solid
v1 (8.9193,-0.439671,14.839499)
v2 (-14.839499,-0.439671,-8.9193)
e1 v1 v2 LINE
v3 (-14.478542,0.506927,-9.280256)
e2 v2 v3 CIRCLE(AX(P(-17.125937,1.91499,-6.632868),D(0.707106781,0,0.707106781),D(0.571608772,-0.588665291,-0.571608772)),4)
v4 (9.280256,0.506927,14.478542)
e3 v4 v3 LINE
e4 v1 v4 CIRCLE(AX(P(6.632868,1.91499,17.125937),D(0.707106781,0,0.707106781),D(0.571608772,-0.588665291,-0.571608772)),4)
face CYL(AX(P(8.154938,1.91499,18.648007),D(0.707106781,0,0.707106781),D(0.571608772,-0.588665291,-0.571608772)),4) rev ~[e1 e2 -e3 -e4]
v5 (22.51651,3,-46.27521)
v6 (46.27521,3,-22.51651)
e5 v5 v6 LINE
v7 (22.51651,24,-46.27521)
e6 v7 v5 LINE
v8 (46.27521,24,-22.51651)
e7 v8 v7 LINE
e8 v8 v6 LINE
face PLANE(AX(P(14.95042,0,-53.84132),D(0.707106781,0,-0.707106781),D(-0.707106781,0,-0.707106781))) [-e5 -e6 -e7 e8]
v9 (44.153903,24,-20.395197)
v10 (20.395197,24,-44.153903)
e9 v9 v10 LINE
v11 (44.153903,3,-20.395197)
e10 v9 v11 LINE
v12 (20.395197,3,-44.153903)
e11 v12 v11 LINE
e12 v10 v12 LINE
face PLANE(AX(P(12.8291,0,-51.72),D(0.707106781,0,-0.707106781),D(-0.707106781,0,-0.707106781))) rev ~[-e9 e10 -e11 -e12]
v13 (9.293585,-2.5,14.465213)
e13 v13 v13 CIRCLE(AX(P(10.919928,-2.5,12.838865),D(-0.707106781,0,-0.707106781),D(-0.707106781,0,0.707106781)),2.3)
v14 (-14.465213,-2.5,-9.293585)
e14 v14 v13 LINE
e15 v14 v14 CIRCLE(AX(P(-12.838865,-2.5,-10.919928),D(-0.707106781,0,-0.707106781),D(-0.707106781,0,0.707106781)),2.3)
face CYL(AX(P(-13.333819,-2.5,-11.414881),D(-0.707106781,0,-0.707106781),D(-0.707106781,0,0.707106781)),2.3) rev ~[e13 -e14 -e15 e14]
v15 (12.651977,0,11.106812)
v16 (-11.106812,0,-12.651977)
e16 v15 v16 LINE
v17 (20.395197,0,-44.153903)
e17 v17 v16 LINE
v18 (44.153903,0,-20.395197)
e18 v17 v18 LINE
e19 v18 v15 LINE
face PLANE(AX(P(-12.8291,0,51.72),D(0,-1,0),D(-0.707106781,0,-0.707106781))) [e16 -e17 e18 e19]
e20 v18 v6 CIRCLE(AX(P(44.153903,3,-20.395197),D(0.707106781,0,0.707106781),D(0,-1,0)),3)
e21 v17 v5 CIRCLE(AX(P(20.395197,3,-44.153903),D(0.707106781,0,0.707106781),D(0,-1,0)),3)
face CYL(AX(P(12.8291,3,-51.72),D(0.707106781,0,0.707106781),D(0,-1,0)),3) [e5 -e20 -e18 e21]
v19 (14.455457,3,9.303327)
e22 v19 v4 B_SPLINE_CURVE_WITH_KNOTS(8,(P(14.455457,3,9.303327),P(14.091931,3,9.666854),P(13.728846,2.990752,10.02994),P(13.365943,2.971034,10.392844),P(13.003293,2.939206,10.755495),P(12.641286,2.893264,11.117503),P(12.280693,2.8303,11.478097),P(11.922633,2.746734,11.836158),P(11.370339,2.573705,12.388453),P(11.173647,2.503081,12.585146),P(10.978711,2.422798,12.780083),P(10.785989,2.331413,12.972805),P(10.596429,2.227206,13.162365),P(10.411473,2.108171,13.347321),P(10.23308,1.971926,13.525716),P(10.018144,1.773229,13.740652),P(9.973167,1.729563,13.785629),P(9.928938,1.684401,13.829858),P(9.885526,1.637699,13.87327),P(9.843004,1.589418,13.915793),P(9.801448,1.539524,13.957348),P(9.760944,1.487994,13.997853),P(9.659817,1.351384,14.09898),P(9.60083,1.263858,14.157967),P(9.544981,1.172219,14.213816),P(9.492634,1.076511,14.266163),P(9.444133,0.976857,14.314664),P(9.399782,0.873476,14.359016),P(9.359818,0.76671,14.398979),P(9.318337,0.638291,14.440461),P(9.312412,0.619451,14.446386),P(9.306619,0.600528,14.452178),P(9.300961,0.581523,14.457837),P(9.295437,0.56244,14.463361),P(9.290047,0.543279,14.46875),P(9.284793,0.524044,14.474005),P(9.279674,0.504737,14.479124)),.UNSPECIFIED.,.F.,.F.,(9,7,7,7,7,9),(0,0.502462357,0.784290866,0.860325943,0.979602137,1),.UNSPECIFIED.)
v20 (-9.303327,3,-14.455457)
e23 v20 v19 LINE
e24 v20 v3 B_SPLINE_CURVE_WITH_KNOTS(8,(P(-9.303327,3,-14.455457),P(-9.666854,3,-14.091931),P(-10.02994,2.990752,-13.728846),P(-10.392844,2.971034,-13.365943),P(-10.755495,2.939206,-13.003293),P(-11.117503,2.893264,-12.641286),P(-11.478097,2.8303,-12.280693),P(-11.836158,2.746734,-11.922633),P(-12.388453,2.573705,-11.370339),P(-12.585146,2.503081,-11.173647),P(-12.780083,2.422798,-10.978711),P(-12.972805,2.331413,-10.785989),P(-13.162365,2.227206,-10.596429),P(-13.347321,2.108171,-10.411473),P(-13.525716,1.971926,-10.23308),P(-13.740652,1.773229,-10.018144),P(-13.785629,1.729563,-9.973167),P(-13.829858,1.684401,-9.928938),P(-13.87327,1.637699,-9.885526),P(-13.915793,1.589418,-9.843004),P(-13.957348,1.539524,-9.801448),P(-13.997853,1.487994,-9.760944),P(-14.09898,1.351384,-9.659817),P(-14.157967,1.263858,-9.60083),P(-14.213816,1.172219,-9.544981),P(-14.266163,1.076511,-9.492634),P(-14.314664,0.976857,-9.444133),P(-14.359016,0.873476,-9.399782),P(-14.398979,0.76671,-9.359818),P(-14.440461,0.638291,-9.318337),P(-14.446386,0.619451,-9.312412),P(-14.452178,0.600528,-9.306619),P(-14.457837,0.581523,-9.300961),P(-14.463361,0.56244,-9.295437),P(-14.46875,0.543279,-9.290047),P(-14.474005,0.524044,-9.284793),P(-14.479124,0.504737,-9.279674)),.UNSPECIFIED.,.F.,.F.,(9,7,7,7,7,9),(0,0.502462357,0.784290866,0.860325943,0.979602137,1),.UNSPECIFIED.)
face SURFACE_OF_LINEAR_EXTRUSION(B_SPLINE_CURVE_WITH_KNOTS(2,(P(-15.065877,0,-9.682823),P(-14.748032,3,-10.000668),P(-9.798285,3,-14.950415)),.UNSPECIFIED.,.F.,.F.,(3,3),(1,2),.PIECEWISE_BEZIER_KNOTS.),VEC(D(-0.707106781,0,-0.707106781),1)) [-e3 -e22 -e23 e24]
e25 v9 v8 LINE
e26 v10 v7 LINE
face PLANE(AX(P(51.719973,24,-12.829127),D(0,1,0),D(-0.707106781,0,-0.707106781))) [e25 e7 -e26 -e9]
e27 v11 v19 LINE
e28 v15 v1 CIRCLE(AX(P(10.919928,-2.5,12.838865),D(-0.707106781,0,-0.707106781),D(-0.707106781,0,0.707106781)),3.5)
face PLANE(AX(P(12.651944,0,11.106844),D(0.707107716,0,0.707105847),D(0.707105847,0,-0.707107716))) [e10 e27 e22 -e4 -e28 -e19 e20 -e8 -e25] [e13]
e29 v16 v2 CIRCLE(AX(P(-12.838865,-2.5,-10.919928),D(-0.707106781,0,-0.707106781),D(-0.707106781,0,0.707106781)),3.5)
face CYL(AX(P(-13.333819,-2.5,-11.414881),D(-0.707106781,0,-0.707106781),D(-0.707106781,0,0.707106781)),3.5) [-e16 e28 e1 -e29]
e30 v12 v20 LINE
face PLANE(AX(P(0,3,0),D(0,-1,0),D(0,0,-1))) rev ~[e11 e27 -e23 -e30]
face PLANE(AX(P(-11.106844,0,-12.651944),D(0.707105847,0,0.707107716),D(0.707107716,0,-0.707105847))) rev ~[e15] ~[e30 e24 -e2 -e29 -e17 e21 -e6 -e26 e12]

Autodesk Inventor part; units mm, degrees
ref_plane "YZ Plane" through (0, 0, 0) normal (1, 0, 0) x (0, 1, 0)
ref_plane "XZ Plane" through (0, 0, 0) normal (0, 1, 0) x (-1, 0, 0)
ref_plane "XY Plane" through (0, 0, 0) normal (0, 0, 1) x (1, 0, 0)
sketch "Esquisse1" plane through (0, 0, 0) normal (0, 1, 0) x (-1, 0, 0)
  line L0 (35, 35) -> (35, 14)
  line L1 (35, 14) -> (42, 10)
  line L2 (42, 10) -> (42, 0)
  line L3 (35, 35) -> (0, 0)
  line L4 (42, 0) -> (0, 0) construction
  line L5 (35, -35) -> (35, -14)
  line L6 (35, -14) -> (42, -10)
  line L7 (42, -10) -> (42, 0)
  line L8 (35, -35) -> (0, 0)
  line L9 (38.5, -12) -> (38.5, 12) construction
  circle A0 centre (38.5, 0) radius 2.15
  circle A1 centre (38.5, 6) radius 2.15
  circle A2 centre (38.5, -6) radius 2.15
  dimension "d0" = 90
  dimension "d1" = 70
  dimension "d4" = 6
  dimension "d11" = 6
  dimension "d16" = 4.3
  dimension "d17" = 20
  dimension "d18" = 4
  dimension "d19" = 7
extrude "Extrusion1" add sketch "Esquisse1" along normal blind 3
pattern_circular "Réseau circulaire1" count 4 over 360 about axis through (0, 0, 0) along (0, 1, 0) of "Extrusion1"
ref_plane "Plan de construction2" through (0, 0, -14) normal (1, 0, 0) x (0, 0, -1)
ref_plane "Plan de construction3" through (-14, 0, 0) normal (0, 0, -1) x (-1, 0, 0)
chamfer "Chanfrein1" distance 10 angle 45 4 edges at (-35, 1.5, -35) (-35, 1.5, 35) (35, 1.5, -35) (35, 1.5, 35)
sketch "Esquisse3" plane through (0, 0, 0) normal (0, -1, 0) x (1, 0, 0)
  circle A0 centre (0, 38.5) radius 2.15 construction
  circle A1 centre (6, 38.5) radius 2.15 construction
  circle A2 centre (-6, 38.5) radius 2.15 construction
  circle A3 centre (38.5, 6) radius 2.15 construction
  circle A4 centre (38.5, -6) radius 2.15 construction
  circle A5 centre (38.5, 0) radius 2.15 construction
  circle A6 centre (6, -38.5) radius 2.15 construction
  circle A7 centre (-6, -38.5) radius 2.15 construction
  circle A8 centre (0, -38.5) radius 2.15 construction
  circle A9 centre (-38.5, -6) radius 2.15 construction
  circle A10 centre (-38.5, 6) radius 2.15 construction
  circle A11 centre (-38.5, 0) radius 2.15 construction
  line L0 (-35, 25) -> (-35, 14) construction
  line L1 (-35, 14) -> (-42, 10) construction
  line L2 (-42, 10) -> (-42, -10) construction
  line L3 (-42, -10) -> (-35, -14) construction
  line L4 (-35, -14) -> (-35, -25) construction
  line L5 (-25, -35) -> (-14, -35) construction
  line L6 (-14, -35) -> (-10, -42) construction
  line L7 (-10, -42) -> (10, -42) construction
  line L8 (10, -42) -> (14, -35) construction
  line L9 (14, -35) -> (25, -35) construction
  line L10 (35, -25) -> (35, -14) construction
  line L11 (35, -14) -> (42, -10) construction
  line L12 (42, -10) -> (42, 10) construction
  line L13 (42, 10) -> (35, 14) construction
  line L14 (35, 14) -> (35, 25) construction
  line L15 (25, 35) -> (14, 35) construction
  line L16 (14, 35) -> (10, 42) construction
  line L17 (10, 42) -> (-10, 42) construction
  line L18 (-10, 42) -> (-14, 35) construction
  line L19 (-14, 35) -> (-25, 35) construction
  line L20 (-51.72, -12.8291) -> (-12.8291, -51.72)
  line L21 (-12.8291, -51.72) -> (-10, -42)
  line L22 (-42, -10) -> (-51.72, -12.8291)
  line L23 (-35, -14) -> (-42, -10)
  line L24 (-42, -10) -> (-35, -14) projected
  line L25 (-10, -42) -> (-14, -35)
  line L26 (-14, -35) -> (-10, -42) projected
  line L27 (25, 35) -> (35, 25) projected
  line L28 (-35, 25) -> (-25, 35) projected
  line L29 (-25, -35) -> (-35, -25) projected
  line L30 (35, -25) -> (25, -35) projected
  line L31 (-14, -35) -> (-35, -14)
  point P0 (0, 0)
  dimension "d32" = 135
  dimension "d33" = 55
extrude "Extrusion3" add sketch "Esquisse3" against normal blind 3
sketch "Esquisse4" plane through (-51.72, 0, -12.8291) normal (-0.7071068, 0, -0.7071068) x (-0.7071068, 0, 0.7071068)
  line L0 (0, 0) -> (-55, 0) construction
  line L1 (0, 0) -> (0, 3) construction
  line L2 (-55, 3) -> (0, 3) construction
  line L3 (-55, 0) -> (-55, 3) construction
  line L4 (0, 0) -> (-55, 0)
  line L5 (-55, 0) -> (-55, 24)
  line L6 (-55, 24) -> (0, 24)
  line L7 (0, 24) -> (0, 0)
  point P0 (-27.5, 0)
  dimension "d36" = 24
extrude "Extrusion4" add sketch "Esquisse4" along normal blind 3
sketch "Esquisse5" plane through (-53.8413, 0, -14.9504) normal (-0.7071068, 0, -0.7071068) x (-0.7071068, 0, 0.7071068)
  line L0 (-55, 0) -> (0, 0) construction
  line L1 (0, 0) -> (0, 24) construction
  line L2 (0, 24) -> (-55, 24) construction
  line L3 (-55, 24) -> (-55, 0) construction
  line L4 (0, 0) -> (0, 24) construction
  line L5 (0, 9.2801) -> (-55, 9.2801) construction
  circle A0 centre (-15.1412, 9.2801) radius 7.3571
  line L6 (-27.5, 0) -> (-27.5, 24) construction
  circle A1 centre (-39.8588, 9.2801) radius 7.3571
extrude "Extrusion5" cut sketch "Esquisse5" against normal blind 1
pattern_circular "Réseau circulaire2" count 4 over 360 about axis through (0, 0, 0) along (0, -1, 0) of "Extrusion3", "Extrusion4"
fillet "Congé1" radius 3 2 edges at (-34.3959, 0, 34.3959) (34.3959, 0, -34.3959)
sketch "Esquisse6" plane through (0, 0, 0) normal (0, -1, 0) x (1, 0, 0)
  line L0 (51.72, -12.8291) -> (12.8291, -51.72) construction
  line L1 (51.72, -12.8291) -> (42, -10) construction
  line L2 (42, -10) -> (42, 10) construction
  line L3 (42, 10) -> (51.72, 12.8291) construction
  line L4 (51.72, 12.8291) -> (53.8413, 14.9504) construction
  line L5 (14.9504, 53.8413) -> (53.8413, 14.9504) construction
  line L6 (12.8291, 51.72) -> (14.9504, 53.8413) construction
  line L7 (12.8291, 51.72) -> (10, 42) construction
  line L8 (10, 42) -> (-10, 42) construction
  line L9 (-10, 42) -> (-12.8291, 51.72) construction
  line L10 (-51.72, 12.8291) -> (-12.8291, 51.72) construction
  line L11 (-51.72, 12.8291) -> (-42, 10) construction
  line L12 (-42, 10) -> (-42, -10) construction
  line L13 (-42, -10) -> (-51.72, -12.8291) construction
  line L14 (-51.72, -12.8291) -> (-53.8413, -14.9504) construction
  line L15 (-14.9504, -53.8413) -> (-53.8413, -14.9504) construction
  line L16 (-12.8291, -51.72) -> (-14.9504, -53.8413) construction
  line L17 (-12.8291, -51.72) -> (-10, -42) construction
  line L18 (-10, -42) -> (10, -42) construction
  line L19 (10, -42) -> (12.8291, -51.72) construction
  circle A0 centre (0, 38.5) radius 2.15 construction
  circle A1 centre (6, 38.5) radius 2.15 construction
  circle A2 centre (-6, 38.5) radius 2.15 construction
  circle A3 centre (38.5, 6) radius 2.15 construction
  circle A4 centre (38.5, -6) radius 2.15 construction
  circle A5 centre (38.5, 0) radius 2.15 construction
  circle A6 centre (6, -38.5) radius 2.15 construction
  circle A7 centre (-6, -38.5) radius 2.15 construction
  circle A8 centre (0, -38.5) radius 2.15 construction
  circle A9 centre (-38.5, -6) radius 2.15 construction
  circle A10 centre (-38.5, 6) radius 2.15 construction
  circle A11 centre (-38.5, 0) radius 2.15 construction
  line L20 (14.9504, -53.8413) -> (53.8413, -14.9504) construction
  line L21 (22.0215, -46.7702) -> (-16.8694, -7.8793)
  line L22 (-16.8694, -7.8793) -> (7.8793, 16.8694)
  line L23 (7.8793, 16.8694) -> (46.7702, -22.0215)
  line L24 (46.7702, -22.0215) -> (22.0215, -46.7702)
  line L25 (-16.8694, -7.8793) -> (-13.3339, -11.4149) construction
  line L26 (-13.3339, -11.4149) -> (11.4149, 13.3339) construction
  line L27 (11.4149, 13.3339) -> (7.8793, 16.8694) construction
  line L28 (-4.495, 4.495) -> (34.3959, -34.3959) construction
  line L29 (-13.3339, -11.4149) -> (-30.7818, -28.8628) construction
  circle A12 centre (-15.4552, -13.5362) radius 1.7
  circle A13 centre (-18.9907, -17.0717) radius 1.7
  circle A14 centre (13.5362, 15.4552) radius 1.7
  circle A15 centre (17.0717, 18.9907) radius 1.7
  point P0 (0, 0)
  dimension "d48" = 35
  dimension "d49" = 55
  dimension "d54" = 35
  dimension "d69" = 5
  dimension "d70" = 3
  dimension "d71" = 3.4
  dimension "d74" = 5
extrude "Extrusion6" cut sketch "Esquisse6" against normal through all contours L21 L22 L23 L24 keep common part
sketch "Esquisse7" plane through (19.9002, 3, -44.6489) normal (-0.7071068, 0, -0.7071068) x (-0.7071068, 0, 0.7071068)
  circle A0 centre (47, -5.5) radius 3.5
  line L0 (47, -3) -> (47, -5.5) construction
  line L1 (0, -3) -> (52, -3) construction
  point P0 (45.6431, -3)
  point P1 (47, -3)
  dimension "d97" = 2.5
  dimension "d98" = 7
extrude "Extrusion7" add sketch "Esquisse7" against normal blind 35
sketch "Esquisse8" plane through (19.9002, 3, -44.6489) normal (-0.7071068, 0, -0.7071068) x (-0.7071068, 0, 0.7071068)
  arc A0 (43.5, -3) -> (50.5, -3) centre (47, -3) ccw projected
  line L0 (49.4495, -3) -> (52, -3) projected
  line L1 (52, -3) -> (52, 0) projected
  line L2 (52, 0) -> (0, 0) projected
  line L3 (0, 0) -> (0, 21) projected
  line L4 (0, 21) -> (-3, 21) projected
  line L5 (-3, 21) -> (-3, 0) projected
  arc A1 (-3, 0) -> (0, -3) centre (0, 0) ccw projected
  line L6 (0, -3) -> (44.5505, -3) projected
  arc A2 (44.5505, -3) -> (49.4495, -3) centre (47, -5.5) ccw projected
  arc A3 (44.5505, -3) -> (49.4495, -3) centre (47, -5.5) ccw projected
  circle A4 centre (47, -5.5) radius 2.3
  point P0 (45.6431, -3)
  dimension "d99" = 4.6
extrude "Extrusion8" cut sketch "Esquisse8" against normal through all contours A4 A0 | A0 A4
sketch "Esquisse11" plane through (19.9002, 3, -44.6489) normal (-0.7071068, 0, -0.7071068) x (-0.7071068, 0, 0.7071068)
  line L0 (49.4495, -3) -> (52, -3) projected
  line L1 (52, -3) -> (52, 0) projected
  line L2 (52, 0) -> (0, 0) projected
  line L3 (0, 0) -> (0, 21) projected
  line L4 (0, 21) -> (-3, 21) projected
  line L5 (-3, 21) -> (-3, 0) projected
  arc A0 (-3, 0) -> (0, -3) centre (0, 0) ccw projected
  line L6 (0, -3) -> (44.5505, -3) projected
  arc A1 (44.5505, -3) -> (49.4495, -3) centre (47, -5.5) ccw projected
  line L7 (49.4495, -3) -> (49, 0) construction
  line L8 (52, 0) -> (0, 0) projected
  line L9 (49, 0) -> (42, 0) construction
  spline S0 degree 2 poles (49.4495, -3) (49, 0) (42, 0) knots 1 1 1 2 2 2
  point P0 (45.6431, -3)
  dimension "d100" = 3
  dimension "d101" = 10
extrude "Extrusion9" cut sketch "Esquisse11" against normal through all contours A1 L6 A0 L5 L4 L3 L2 S0 keep common part
fillet "Congé4" radius 4 1 edges at (-2.6915, 0, 2.6915)
sketch "Esquisse12" plane through (0, 0, 0) normal (0, -1, 0) x (1, 0, 0)
  line L0 (19.9002, -44.6489) -> (-11.6018, -13.1469) projected
  line L1 (44.6489, -19.9002) -> (19.9002, -44.6489) projected
  line L2 (13.1469, 11.6018) -> (44.6489, -19.9002) projected
  line L3 (22.0215, -46.7702) -> (46.7702, -22.0215) construction
  line L4 (34.3959, -34.3959) -> (-3.4344, 3.4344) construction
  line L5 (-15.8087, -8.94) -> (8.94, 15.8087) construction
  line L6 (-15.8087, -8.94) -> (8.94, 15.8087) projected
  line L7 (-15.3138, -8.445) -> (22.5165, -46.2752)
  line L8 (8.445, 15.3138) -> (46.2752, -22.5165)
  line L9 (22.5165, -46.2752) -> (22.0215, -46.7702)
  line L10 (22.0215, -46.7702) -> (-15.8087, -8.94)
  line L11 (-15.8087, -8.94) -> (-15.3138, -8.445)
  line L12 (46.2752, -22.5165) -> (46.7702, -22.0215)
  line L13 (46.7702, -22.0215) -> (8.94, 15.8087)
  line L14 (8.94, 15.8087) -> (8.445, 15.3138)
  line L15 (13.1469, 11.6018) -> (-11.6018, -13.1469) projected
  point P0 (-9.0912, -12.122)
  dimension "d91" = 0.7
extrude "Extrusion10" cut sketch "Esquisse12" along normal through all both and the other way through all contours L0 L15 L7 L1 | L1 L7 L9 L10 | L10 L6 L7 L15 | L8 L15 L2 L1 | L1 L13 L12 L8 | L8 L6 L13 L15
properties part number "clapet"
